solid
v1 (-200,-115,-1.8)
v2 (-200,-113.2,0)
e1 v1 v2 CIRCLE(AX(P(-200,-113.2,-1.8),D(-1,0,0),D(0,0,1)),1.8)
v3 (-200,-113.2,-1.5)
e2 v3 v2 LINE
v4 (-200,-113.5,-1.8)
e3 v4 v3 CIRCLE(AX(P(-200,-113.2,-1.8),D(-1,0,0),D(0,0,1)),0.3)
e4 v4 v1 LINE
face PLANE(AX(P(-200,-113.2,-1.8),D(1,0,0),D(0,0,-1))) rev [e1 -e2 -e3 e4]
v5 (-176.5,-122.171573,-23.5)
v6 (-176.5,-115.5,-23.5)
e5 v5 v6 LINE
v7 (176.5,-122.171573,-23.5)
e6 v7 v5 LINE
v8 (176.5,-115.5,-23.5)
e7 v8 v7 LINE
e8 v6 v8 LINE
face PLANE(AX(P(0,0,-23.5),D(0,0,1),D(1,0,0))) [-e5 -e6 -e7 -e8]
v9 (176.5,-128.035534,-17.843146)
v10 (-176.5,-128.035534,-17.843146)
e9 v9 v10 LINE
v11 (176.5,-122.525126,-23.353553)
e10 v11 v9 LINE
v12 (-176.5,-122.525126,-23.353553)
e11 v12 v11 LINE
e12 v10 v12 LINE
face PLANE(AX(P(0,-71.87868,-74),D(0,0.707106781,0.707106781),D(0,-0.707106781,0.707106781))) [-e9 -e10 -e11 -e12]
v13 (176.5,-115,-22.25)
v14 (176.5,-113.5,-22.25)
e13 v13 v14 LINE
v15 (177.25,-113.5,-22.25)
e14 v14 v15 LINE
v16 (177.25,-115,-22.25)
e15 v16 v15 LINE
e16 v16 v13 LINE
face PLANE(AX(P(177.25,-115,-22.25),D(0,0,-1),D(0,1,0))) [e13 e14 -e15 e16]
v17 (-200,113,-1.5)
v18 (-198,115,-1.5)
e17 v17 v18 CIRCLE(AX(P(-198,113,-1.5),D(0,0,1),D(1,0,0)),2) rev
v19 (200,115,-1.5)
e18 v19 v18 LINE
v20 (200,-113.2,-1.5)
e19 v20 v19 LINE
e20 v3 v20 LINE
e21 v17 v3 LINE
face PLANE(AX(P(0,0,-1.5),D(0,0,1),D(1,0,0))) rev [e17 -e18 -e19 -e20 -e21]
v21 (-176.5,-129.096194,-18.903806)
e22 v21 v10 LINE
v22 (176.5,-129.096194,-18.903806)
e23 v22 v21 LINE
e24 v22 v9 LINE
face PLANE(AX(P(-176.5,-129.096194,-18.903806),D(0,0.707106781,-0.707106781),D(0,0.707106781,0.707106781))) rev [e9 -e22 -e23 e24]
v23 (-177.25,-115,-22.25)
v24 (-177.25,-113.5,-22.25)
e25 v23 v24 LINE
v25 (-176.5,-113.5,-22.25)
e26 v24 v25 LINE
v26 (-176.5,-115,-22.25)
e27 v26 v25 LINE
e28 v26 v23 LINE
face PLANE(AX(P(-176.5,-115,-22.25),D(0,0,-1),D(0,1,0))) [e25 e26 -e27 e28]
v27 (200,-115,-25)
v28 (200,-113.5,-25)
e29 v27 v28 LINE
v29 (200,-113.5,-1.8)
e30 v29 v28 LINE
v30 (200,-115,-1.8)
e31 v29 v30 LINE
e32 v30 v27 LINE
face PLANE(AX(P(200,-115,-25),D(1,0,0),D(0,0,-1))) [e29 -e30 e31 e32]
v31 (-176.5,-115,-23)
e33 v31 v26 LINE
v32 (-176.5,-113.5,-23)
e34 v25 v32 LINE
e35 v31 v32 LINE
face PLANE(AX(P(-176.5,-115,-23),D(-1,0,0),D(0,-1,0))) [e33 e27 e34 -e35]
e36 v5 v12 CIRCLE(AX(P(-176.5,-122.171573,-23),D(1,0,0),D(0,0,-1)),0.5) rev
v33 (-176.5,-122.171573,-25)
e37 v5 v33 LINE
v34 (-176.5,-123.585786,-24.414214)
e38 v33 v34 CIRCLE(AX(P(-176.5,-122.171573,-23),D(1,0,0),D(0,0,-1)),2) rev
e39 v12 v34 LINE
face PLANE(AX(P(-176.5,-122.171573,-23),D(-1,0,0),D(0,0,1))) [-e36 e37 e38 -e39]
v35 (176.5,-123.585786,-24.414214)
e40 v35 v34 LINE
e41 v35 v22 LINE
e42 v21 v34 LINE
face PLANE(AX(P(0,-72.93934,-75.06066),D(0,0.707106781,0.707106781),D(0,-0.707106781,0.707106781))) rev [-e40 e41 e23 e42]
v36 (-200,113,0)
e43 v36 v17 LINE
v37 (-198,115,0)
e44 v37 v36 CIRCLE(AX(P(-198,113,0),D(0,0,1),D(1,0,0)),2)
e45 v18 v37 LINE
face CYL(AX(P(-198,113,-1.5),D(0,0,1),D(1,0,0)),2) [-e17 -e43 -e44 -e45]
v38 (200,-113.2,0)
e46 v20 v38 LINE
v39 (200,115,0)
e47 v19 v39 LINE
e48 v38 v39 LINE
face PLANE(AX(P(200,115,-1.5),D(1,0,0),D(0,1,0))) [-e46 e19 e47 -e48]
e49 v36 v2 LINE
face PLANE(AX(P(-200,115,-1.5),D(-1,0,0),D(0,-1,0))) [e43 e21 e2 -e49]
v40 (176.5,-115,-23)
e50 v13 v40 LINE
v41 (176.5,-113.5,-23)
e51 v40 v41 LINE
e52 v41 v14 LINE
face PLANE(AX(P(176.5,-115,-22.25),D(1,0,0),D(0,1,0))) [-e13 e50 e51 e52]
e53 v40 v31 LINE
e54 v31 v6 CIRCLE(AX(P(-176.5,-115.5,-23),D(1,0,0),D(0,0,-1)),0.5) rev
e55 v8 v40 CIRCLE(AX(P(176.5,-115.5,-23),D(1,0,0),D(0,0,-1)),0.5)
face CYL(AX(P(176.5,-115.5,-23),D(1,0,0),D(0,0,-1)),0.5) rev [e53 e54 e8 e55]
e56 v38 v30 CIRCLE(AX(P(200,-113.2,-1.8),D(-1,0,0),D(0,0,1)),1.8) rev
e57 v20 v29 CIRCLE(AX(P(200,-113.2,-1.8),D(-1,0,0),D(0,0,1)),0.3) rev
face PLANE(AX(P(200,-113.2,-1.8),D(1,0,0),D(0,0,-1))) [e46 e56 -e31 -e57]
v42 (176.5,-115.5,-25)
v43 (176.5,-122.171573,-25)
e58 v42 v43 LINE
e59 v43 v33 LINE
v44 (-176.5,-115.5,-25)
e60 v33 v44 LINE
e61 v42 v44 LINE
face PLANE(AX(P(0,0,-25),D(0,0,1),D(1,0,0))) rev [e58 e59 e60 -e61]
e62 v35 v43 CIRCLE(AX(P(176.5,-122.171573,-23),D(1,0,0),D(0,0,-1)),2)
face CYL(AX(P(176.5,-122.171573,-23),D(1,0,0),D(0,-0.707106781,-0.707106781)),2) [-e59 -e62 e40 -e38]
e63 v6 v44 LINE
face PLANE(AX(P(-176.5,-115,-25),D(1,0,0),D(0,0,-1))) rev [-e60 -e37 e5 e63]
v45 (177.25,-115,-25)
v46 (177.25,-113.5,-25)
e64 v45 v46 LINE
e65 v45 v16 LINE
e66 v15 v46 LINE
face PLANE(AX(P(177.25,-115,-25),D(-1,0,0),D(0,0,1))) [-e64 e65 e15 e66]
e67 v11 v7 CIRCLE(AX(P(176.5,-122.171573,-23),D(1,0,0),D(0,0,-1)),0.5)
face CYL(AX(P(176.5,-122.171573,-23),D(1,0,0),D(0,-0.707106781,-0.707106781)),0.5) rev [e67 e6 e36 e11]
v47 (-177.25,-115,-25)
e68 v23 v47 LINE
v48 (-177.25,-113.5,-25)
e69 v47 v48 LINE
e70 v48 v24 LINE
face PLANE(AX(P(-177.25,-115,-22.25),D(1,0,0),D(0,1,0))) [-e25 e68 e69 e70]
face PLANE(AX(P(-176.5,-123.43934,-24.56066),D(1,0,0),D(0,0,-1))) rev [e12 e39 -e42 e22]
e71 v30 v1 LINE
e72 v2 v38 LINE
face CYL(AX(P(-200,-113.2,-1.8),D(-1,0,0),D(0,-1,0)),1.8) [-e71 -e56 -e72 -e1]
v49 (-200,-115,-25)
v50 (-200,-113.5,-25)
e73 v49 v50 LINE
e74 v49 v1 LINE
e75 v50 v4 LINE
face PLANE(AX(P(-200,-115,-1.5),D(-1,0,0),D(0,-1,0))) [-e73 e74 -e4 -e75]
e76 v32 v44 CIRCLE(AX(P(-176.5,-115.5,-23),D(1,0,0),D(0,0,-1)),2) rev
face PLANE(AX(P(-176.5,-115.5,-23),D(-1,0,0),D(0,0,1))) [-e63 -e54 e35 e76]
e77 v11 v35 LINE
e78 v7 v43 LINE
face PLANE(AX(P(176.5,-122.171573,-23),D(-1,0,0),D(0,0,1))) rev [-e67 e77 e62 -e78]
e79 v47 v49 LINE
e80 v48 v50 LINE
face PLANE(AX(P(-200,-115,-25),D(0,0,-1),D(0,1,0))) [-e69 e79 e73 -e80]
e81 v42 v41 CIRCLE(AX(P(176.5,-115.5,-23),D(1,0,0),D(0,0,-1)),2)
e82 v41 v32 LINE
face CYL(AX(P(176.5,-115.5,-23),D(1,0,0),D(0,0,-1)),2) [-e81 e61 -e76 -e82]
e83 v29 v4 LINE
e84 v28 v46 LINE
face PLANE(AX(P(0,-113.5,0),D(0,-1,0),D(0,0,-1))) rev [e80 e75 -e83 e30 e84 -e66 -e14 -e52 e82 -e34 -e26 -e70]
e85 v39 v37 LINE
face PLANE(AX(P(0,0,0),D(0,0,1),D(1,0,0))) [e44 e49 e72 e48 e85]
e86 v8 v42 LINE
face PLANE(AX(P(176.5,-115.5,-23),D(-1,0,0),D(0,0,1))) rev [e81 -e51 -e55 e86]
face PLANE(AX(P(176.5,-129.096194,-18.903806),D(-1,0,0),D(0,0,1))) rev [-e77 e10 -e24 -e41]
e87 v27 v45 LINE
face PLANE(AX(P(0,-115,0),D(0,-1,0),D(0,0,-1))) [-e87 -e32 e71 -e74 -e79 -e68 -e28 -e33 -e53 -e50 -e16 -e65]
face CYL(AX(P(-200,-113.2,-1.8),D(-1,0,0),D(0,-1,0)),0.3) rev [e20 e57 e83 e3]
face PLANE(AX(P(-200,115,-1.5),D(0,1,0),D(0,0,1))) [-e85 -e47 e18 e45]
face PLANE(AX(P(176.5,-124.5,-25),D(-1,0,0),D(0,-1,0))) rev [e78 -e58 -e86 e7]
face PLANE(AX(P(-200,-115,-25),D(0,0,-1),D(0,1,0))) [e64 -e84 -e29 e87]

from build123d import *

# Parameters (mm, degrees)
SKETCH_1_W                        = 400
SKETCH_1_H                        = 230
SM_BASE_FLANGE_1_DEPTH            = 1.5
SM_EDGE_FLANGE_1_STRIP_W          = 6.6
SM_EDGE_FLANGE_1_STRIP_H          = 1.5
SM_EDGE_FLANGE_1_STRIP_CUT_DEPTH  = 400
SM_EDGE_FLANGE_1_DEPTH            = 400
SM_EDGE_FLANGE_2_STRIP_W          = 7
SM_EDGE_FLANGE_2_STRIP_H          = 1.5
SM_EDGE_FLANGE_2_STRIP_CUT_DEPTH  = 353
SM_EDGE_FLANGE_2_RELIEF_W         = 7.75
SM_EDGE_FLANGE_2_RELIEF_H         = 0.75
SM_EDGE_FLANGE_2_RELIEF_CUT_DEPTH = 1.5
SM_EDGE_FLANGE_2_DEPTH            = 353
FILLET_1_R                        = 2
SM_START                          = -176.5
SM_EDGE_FLANGE_3_DEPTH            = 353
SM_EDGE_FLANGE_3_2_DEPTH          = 353


# Read off the part's stored shape, not the designer's step: 边线-法兰3
# Sheet-metal steps are written as plain solids
with BuildPart() as part:
    # Sketch 1 → 基体-法兰1 (new body)
    with BuildSketch(Plane.XY):
        Rectangle(SKETCH_1_W, SKETCH_1_H)
    extrude(amount=-SM_BASE_FLANGE_1_DEPTH)

    # 边线-法兰1 strip (across the edge) → 边线-法兰1 strip cut (cut)
    with BuildSketch(Plane(origin=(200, -115, -1.5), x_dir=(0, 1, 0), z_dir=(-1, 0, 0))):
        with Locations((-1.5, -0.75)):
            Rectangle(SM_EDGE_FLANGE_1_STRIP_W, SM_EDGE_FLANGE_1_STRIP_H)
    extrude(amount=SM_EDGE_FLANGE_1_STRIP_CUT_DEPTH, mode=Mode.SUBTRACT)

    # 边线-法兰1 section (across the edge) → 边线-法兰1 (add)
    with BuildSketch(Plane(origin=(200, -115, -1.5), x_dir=(0, 1, 0), z_dir=(-1, 0, 0))):
        with BuildLine():
            Line((0, 0.3), (0, 23.5))
            Line((0, 23.5), (1.5, 23.5))
            Line((1.5, 23.5), (1.5, 0.3))
            ThreePointArc((1.5, 0.3), (1.587867966, 0.087867966), (1.8, 0))
            Line((1.8, 0), (1.8, -1.5))
            ThreePointArc((1.8, -1.5), (0.527207794, -0.972792206), (0, 0.3))
        make_face()
    extrude(amount=SM_EDGE_FLANGE_1_DEPTH)

    # 边线-法兰2 strip (across the edge) → 边线-法兰2 strip cut (cut)
    with BuildSketch(Plane(origin=(-176.5, -115, -25), x_dir=(0, 0, 1), z_dir=(1, 0, 0))):
        with Locations((-1.5, -0.75)):
            Rectangle(SM_EDGE_FLANGE_2_STRIP_W, SM_EDGE_FLANGE_2_STRIP_H)
    extrude(amount=SM_EDGE_FLANGE_2_STRIP_CUT_DEPTH, mode=Mode.SUBTRACT)

    # 边线-法兰2 relief (on the sheet) → 边线-法兰2 relief cut (cut)
    with BuildSketch(Plane(origin=(-176.5, -115, -23), x_dir=(0, 0, 1), z_dir=(0, -1, 0))):
        with Locations((-3.125, 0.375)):
            Rectangle(SM_EDGE_FLANGE_2_RELIEF_W, SM_EDGE_FLANGE_2_RELIEF_H)
        with Locations((-3.125, -353.375)):
            Rectangle(SM_EDGE_FLANGE_2_RELIEF_W, SM_EDGE_FLANGE_2_RELIEF_H)
    extrude(amount=-SM_EDGE_FLANGE_2_RELIEF_CUT_DEPTH, mode=Mode.SUBTRACT)

    # 边线-法兰2 section (across the edge) → 边线-法兰2 (add)
    with BuildSketch(Plane(origin=(-176.5, -115, -25), x_dir=(0, 0, 1), z_dir=(1, 0, 0))):
        with BuildLine():
            Line((0, 0.5), (0, 9.5))
            Line((0, 9.5), (1.5, 9.5))
            Line((1.5, 9.5), (1.5, 0.5))
            ThreePointArc((1.5, 0.5), (1.646446609, 0.146446609), (2, 0))
            Line((2, 0), (2, -1.5))
            ThreePointArc((2, -1.5), (0.585786438, -0.914213562), (0, 0.5))
        make_face()
    extrude(amount=SM_EDGE_FLANGE_2_DEPTH)

    # 圆角1
    fillet_1_edges = [part.edges().sort_by_distance(p)[0] for p in [
        (-200, 115, -0.75),
    ]]
    fillet(fillet_1_edges, radius=FILLET_1_R)

    # 边线-法兰3 outline → 边线-法兰3 (cut)
    with BuildSketch(Plane.YZ.offset(SM_START)):
        with BuildLine():
            ThreePointArc((-122.171572875, -25), (-122.93693974, -24.847759065), (-123.585786438, -24.414213562))
            Line((-123.585786438, -24.414213562), (-124.5, -23.5))
            Line((-124.5, -23.5), (-124.5, -25))
            Line((-124.5, -25), (-122.171572875, -25))
        make_face()
    extrude(amount=SM_EDGE_FLANGE_3_DEPTH, mode=Mode.SUBTRACT)

    # Sm Edge Flange 3 2 outline → Sm Edge Flange 3 2 (add)
    with BuildSketch(Plane.YZ.offset(SM_START)):
        with BuildLine():
            Line((-129.096194078, -18.903805922), (-124.5, -23.5))
            Line((-124.5, -23.5), (-122.171572875, -23.5))
            ThreePointArc((-122.171572875, -23.5), (-122.362914591, -23.461939766), (-122.525126266, -23.353553391))
            Line((-122.525126266, -23.353553391), (-128.035533906, -17.843145751))
            Line((-128.035533906, -17.843145751), (-129.096194078, -18.903805922))
        make_face()
    extrude(amount=SM_EDGE_FLANGE_3_2_DEPTH)


solid = part.part
